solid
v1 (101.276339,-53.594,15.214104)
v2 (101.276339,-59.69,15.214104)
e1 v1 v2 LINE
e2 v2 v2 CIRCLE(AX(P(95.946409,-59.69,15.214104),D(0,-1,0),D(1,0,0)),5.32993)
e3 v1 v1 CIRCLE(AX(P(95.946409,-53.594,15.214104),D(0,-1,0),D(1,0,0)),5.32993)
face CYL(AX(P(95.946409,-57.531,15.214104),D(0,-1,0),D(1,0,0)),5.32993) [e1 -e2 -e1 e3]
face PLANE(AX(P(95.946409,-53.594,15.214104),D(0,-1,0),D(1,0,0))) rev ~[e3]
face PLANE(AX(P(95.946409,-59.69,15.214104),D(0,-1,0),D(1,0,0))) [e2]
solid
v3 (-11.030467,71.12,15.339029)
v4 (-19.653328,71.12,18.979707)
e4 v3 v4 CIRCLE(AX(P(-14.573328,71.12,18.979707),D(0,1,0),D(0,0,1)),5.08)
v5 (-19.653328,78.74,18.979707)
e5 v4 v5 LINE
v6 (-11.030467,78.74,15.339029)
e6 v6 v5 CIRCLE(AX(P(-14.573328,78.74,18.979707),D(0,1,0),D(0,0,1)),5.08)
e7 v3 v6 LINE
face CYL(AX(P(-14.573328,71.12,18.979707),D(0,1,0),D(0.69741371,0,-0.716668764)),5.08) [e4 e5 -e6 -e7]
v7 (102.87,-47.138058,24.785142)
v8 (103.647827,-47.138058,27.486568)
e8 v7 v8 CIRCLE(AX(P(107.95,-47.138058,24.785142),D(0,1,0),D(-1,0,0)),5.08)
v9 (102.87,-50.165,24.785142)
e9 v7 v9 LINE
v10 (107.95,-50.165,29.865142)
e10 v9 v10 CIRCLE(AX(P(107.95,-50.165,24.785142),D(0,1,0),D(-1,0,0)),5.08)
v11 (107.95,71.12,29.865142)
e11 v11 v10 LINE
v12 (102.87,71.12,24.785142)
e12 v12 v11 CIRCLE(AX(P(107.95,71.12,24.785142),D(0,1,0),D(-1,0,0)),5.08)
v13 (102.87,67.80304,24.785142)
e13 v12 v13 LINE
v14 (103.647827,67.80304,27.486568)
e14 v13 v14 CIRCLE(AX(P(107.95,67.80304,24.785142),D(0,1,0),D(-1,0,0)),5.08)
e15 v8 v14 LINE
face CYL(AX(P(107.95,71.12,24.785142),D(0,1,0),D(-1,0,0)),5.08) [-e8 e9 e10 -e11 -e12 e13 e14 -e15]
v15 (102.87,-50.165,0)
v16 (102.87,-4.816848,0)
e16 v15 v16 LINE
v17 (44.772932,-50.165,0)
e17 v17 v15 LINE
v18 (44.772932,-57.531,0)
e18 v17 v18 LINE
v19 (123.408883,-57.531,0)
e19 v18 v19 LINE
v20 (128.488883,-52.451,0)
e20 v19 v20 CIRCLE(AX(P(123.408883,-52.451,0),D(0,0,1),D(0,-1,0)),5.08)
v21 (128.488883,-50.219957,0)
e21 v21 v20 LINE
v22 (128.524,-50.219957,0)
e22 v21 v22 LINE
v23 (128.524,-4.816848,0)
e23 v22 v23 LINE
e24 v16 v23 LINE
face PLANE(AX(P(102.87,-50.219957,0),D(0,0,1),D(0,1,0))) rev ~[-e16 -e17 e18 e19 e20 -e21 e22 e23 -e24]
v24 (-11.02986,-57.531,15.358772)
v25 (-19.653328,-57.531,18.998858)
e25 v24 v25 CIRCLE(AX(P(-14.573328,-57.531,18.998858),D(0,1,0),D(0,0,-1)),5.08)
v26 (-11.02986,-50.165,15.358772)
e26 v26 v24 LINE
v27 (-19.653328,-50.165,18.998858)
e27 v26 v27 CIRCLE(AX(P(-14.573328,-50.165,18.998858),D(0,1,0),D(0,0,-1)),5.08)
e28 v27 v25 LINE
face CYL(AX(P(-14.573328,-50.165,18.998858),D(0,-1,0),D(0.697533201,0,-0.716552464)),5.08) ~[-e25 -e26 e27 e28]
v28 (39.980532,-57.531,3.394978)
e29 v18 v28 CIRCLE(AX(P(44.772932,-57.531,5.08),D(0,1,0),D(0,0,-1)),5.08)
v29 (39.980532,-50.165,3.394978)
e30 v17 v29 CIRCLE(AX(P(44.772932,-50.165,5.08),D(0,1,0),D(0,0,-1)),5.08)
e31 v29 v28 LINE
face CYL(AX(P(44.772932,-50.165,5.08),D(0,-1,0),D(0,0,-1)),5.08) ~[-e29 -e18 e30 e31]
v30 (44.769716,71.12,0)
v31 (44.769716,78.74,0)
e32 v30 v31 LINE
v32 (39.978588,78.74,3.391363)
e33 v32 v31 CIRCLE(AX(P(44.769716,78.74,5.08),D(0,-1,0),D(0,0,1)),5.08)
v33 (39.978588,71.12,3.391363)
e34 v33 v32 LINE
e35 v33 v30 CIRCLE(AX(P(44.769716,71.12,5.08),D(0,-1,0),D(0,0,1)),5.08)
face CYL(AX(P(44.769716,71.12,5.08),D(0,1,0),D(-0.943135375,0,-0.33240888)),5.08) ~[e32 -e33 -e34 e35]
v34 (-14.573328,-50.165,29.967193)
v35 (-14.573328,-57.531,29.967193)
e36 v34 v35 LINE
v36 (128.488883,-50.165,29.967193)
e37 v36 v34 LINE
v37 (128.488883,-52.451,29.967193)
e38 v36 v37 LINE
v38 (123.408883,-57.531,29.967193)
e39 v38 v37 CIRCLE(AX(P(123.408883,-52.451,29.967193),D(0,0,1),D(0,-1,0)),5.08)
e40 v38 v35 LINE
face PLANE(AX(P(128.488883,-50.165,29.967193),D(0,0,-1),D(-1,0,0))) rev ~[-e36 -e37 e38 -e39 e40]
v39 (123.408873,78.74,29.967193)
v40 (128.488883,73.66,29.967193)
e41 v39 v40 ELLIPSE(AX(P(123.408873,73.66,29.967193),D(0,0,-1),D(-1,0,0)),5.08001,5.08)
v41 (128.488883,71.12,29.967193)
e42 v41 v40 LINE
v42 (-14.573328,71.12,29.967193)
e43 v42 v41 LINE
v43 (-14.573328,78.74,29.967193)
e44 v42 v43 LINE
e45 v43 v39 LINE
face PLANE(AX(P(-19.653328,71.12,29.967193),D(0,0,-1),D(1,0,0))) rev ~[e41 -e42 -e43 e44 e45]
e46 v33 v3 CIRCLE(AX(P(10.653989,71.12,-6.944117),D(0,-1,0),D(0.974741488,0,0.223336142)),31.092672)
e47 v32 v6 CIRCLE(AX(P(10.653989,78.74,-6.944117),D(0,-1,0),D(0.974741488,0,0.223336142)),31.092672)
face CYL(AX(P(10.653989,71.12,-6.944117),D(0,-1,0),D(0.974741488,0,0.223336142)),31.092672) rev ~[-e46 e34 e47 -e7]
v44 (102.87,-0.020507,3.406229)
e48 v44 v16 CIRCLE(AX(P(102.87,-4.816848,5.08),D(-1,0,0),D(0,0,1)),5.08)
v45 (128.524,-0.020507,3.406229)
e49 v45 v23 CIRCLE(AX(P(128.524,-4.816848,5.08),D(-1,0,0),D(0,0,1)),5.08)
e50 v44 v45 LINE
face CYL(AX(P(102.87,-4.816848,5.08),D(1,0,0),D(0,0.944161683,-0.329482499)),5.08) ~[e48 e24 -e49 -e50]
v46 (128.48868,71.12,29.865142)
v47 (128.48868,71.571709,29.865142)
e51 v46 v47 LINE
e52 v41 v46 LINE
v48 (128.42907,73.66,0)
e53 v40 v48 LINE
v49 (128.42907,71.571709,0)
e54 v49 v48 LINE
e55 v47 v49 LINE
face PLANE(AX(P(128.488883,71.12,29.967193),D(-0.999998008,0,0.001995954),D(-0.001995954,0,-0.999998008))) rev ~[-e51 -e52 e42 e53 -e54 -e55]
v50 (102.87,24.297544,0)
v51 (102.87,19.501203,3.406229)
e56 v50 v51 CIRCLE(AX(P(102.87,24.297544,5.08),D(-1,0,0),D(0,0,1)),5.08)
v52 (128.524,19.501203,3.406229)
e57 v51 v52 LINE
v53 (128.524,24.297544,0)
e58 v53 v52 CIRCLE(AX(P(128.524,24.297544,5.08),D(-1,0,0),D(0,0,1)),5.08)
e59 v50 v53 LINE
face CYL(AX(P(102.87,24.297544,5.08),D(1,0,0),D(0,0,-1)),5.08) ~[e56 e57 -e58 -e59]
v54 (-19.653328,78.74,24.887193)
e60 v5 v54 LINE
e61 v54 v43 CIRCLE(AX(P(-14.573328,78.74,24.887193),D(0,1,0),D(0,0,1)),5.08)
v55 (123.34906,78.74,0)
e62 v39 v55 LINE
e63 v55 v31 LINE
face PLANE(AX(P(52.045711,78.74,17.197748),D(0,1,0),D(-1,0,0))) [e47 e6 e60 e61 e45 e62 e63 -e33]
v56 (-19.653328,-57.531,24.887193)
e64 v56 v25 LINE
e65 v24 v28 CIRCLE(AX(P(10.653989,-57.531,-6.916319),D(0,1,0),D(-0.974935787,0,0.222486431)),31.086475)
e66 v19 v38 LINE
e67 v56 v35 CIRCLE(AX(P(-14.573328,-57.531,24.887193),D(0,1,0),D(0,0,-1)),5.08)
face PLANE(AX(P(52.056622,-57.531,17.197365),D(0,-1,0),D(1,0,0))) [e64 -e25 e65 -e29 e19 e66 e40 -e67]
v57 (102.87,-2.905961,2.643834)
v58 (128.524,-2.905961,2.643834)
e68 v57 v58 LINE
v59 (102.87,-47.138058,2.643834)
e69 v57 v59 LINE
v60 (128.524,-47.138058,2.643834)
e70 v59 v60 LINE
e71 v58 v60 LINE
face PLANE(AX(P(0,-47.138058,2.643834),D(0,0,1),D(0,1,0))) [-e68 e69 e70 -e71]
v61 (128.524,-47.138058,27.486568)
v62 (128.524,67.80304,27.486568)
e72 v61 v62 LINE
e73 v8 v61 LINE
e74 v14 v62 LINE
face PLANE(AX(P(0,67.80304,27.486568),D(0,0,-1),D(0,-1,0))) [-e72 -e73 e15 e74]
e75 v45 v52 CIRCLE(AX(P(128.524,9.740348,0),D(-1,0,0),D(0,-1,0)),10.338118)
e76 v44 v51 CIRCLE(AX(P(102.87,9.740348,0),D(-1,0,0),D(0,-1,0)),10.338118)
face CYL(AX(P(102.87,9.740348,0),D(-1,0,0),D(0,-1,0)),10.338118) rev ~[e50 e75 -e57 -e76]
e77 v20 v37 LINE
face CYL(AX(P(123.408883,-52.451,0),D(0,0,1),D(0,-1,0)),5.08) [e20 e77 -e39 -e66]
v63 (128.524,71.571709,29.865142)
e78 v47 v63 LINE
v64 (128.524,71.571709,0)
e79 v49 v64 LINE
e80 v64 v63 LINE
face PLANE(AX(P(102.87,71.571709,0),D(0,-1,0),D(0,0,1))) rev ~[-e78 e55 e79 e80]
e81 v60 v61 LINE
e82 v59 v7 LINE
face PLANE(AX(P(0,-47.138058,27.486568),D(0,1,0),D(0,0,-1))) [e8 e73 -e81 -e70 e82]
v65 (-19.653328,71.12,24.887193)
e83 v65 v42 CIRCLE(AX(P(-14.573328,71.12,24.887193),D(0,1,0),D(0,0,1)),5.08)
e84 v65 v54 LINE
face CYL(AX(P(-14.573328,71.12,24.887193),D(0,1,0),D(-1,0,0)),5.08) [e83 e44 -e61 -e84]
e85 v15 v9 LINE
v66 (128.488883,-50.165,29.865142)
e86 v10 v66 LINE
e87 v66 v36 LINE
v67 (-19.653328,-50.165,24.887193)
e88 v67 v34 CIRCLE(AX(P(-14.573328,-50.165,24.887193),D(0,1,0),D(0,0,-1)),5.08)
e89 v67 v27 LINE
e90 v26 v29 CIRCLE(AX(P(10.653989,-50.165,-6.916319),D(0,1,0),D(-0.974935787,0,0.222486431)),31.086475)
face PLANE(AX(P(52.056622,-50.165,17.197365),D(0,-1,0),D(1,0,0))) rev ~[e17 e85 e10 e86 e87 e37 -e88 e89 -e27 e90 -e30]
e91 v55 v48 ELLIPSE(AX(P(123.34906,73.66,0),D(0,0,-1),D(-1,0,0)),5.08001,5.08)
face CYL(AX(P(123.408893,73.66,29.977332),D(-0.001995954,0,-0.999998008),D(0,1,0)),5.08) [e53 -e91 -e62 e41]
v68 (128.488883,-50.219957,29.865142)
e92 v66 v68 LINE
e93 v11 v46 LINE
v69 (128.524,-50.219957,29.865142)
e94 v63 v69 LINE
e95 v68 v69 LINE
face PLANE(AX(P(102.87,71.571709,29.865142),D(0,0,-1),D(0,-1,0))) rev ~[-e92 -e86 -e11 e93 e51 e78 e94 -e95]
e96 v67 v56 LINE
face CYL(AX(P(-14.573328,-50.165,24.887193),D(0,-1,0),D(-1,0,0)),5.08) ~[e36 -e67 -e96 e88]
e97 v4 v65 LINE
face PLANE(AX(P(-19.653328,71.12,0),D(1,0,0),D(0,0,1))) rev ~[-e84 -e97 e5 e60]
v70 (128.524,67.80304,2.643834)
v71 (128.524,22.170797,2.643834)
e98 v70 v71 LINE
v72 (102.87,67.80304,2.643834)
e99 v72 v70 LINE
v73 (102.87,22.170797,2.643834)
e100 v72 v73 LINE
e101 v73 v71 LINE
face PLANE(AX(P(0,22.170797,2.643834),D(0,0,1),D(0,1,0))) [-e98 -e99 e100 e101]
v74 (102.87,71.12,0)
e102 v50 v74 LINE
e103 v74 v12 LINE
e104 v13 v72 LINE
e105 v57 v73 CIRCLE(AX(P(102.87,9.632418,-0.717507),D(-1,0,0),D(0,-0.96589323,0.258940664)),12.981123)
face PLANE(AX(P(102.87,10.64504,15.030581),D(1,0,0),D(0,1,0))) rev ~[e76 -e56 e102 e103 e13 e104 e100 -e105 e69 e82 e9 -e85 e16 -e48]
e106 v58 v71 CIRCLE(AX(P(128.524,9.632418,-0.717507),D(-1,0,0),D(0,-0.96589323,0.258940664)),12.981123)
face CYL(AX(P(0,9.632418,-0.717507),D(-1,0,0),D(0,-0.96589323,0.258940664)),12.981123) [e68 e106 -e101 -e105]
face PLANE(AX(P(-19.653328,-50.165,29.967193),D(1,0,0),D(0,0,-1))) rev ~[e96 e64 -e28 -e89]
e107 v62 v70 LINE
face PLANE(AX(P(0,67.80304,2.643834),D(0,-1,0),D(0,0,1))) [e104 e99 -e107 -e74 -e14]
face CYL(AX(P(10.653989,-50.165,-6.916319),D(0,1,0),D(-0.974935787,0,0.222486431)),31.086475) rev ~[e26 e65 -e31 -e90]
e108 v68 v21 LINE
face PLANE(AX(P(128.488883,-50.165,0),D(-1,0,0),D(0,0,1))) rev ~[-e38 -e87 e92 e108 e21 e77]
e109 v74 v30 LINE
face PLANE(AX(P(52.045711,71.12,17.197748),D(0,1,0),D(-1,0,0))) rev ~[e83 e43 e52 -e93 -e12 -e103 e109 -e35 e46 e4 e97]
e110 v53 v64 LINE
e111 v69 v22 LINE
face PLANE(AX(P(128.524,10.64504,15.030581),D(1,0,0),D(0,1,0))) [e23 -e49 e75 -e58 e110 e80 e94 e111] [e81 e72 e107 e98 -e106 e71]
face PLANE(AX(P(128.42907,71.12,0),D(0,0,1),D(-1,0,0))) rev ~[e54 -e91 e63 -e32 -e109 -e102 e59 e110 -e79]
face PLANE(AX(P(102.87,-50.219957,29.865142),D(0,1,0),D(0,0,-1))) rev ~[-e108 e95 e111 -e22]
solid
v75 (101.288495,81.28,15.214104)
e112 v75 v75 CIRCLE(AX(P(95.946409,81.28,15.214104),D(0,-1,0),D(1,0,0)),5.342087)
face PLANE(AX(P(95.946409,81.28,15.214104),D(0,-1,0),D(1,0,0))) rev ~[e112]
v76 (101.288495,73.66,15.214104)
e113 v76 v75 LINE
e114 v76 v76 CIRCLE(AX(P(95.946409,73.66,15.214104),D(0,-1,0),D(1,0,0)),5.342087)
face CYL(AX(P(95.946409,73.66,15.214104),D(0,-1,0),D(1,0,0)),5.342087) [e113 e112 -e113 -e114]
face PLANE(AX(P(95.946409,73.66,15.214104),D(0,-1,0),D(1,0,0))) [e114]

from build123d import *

# Parameters (mm, degrees)
F1_START      = 50.165
F1_DEPTH      = 7.366
F3_START      = 102.87
F3_DEPTH      = 25.654
F5_DEPTH      = 156.845
F5_DEPTH_BACK = 153.67
F7_START      = 121.285
F7_DEPTH      = 7.62
F8_R          = 5.3299304063
F9_DEPTH      = 2.159
F9_DEPTH_BACK = 3.937
F11_START     = -133.35
F10_R         = 5.3420866917
F11_DEPTH     = 7.62
F12_R         = 5.08
F13_R         = 5.08
F14_R         = 5.08
F15_T1_DEPTH  = 121.285
F16_R         = 5.08


# Not quite as in the source:
# - a fillet or chamfer that OpenCascade refuses, or shapes differently, is made with other operations: its cross-section is extruded or revolved along the edge and cut away or added


with BuildPart() as f1:
    # F0 (on Front) → F1 (new body)
    with BuildSketch(Plane.XZ.offset(F1_START)):
        with BuildLine():
            Line((128.4888833761, 0), (128.4888833761, 29.9671925604))
            Line((128.4888833761, 29.9671925604), (-19.6533282994, 29.9671925604))
            Line((-19.6533282994, 29.9671925604), (-19.6533282994, 0))
            ThreePointArc((-19.6533282994, 0), (10.6539891214, 24.1701564864), (40.9613065422, 0))
            Line((40.9613065422, 0), (128.4888833761, 0))
        make_face()
    extrude(amount=F1_DEPTH)

    # F2 (on Right) → F3 (join)
    with BuildSketch(Plane.YZ.offset(F3_START)):
        with BuildLine():
            Line((71.5717085687, 29.865141958), (-50.2199567854, 29.865141958))
            Line((-50.2199567854, 29.865141958), (-50.2199567854, 0))
            Line((-50.2199567854, 0), (-0.5977698866, 0))
            ThreePointArc((-0.5977698866, 0), (9.740347974, 10.3381178606), (20.0784658346, 0))
            Line((20.0784658346, 0), (71.5717085687, 0))
            Line((71.5717085687, 0), (71.5717085687, 29.865141958))
        make_face()
    extrude(amount=F3_DEPTH)

    # F4 (on Right) → F5 (cut, two sides)
    with BuildSketch(Plane.YZ) as f5_sk:
        with BuildLine():
            Line((67.8030401468, 27.4865683168), (-47.1380576491, 27.4865683168))
            Line((-47.1380576491, 27.4865683168), (-47.1380576491, 2.6438338682))
            Line((-47.1380576491, 2.6438338682), (-2.90596069, 2.6438338682))
            ThreePointArc((-2.90596069, 2.6438338682), (9.6324179322, 12.2636161005), (22.1707965543, 2.6438338682))
            Line((22.1707965543, 2.6438338682), (67.8030401468, 2.6438338682))
            Line((67.8030401468, 2.6438338682), (67.8030401468, 27.4865683168))
        make_face()
    extrude(amount=-F5_DEPTH, mode=Mode.SUBTRACT)
    extrude(f5_sk.sketch, amount=F5_DEPTH_BACK, mode=Mode.SUBTRACT)

    # F6 (on face) → F7 (join)
    with BuildSketch(Plane(origin=(0, -50.165, 0), x_dir=(-1, 0, 0), z_dir=(0, 1, 0)).offset(F7_START)):
        with BuildLine():
            ThreePointArc((-40.9613065422, 0), (-10.6539891214, 24.1485546437), (19.6533282994, 0))
            Line((19.6533282994, 0), (19.6533282994, 29.9671925604))
            Line((19.6533282994, 29.9671925604), (-128.4888833761, 29.9671925604))
            Line((-128.4888833761, 29.9671925604), (-128.4290701151, 0))
            Line((-128.4290701151, 0), (-40.9613065422, 0))
        make_face()
    extrude(amount=F7_DEPTH)

    # F12
    f12_edges = [f1.edges().sort_by_distance(p)[0] for p in [
        (-19.653328, -53.848, 0),
        (-19.653328, 74.93, 0),
        (-19.653328, -53.848, 29.967193),
        (-19.653328, 74.93, 29.967193),
    ]]
    fillet(f12_edges, radius=F12_R)

    # F13
    f13_edges = [f1.edges().sort_by_distance(p)[0] for p in [
        (40.961307, -53.848, 0),
        (40.961307, 74.93, 0),
    ]]
    fillet(f13_edges, radius=F13_R)

    # F14
    f14_edges = [f1.edges().sort_by_distance(p)[0] for p in [
        (115.697, -0.59777, 0),
        (115.697, 20.078466, 0),
    ]]
    fillet(f14_edges, radius=F14_R)

    # F15: fillet of radius 5.08 on 1 edges, made by hand

    # F15_s2 → F15_t1 (cut)
    with BuildSketch(Plane.XZ.offset(-71.12)):
        with BuildLine():
            ThreePointArc((102.87, 24.785141958), (104.3578975516, 28.3772444064), (107.95, 29.865141958))
            Line((107.95, 29.865141958), (102.87, 29.865141958))
            Line((102.87, 29.865141958), (102.87, 24.785141958))
        make_face()
    extrude(amount=F15_T1_DEPTH, mode=Mode.SUBTRACT)

    # F16
    f16_edges = [f1.edges().sort_by_distance(p)[0] for p in [
        (128.458977, 78.74, 14.983596),
        (128.488883, -57.531, 14.983596),
    ]]
    fillet(f16_edges, radius=F16_R)


with BuildPart() as f9:
    # F8 (on face) → F9 (new body, two sides)
    with BuildSketch(Plane.XZ.offset(57.531)) as f9_sk:
        with Locations((95.9464088082, 15.2141042054)):
            Circle(F8_R)
    extrude(amount=F9_DEPTH)
    extrude(f9_sk.sketch, amount=-F9_DEPTH_BACK)


with BuildPart() as f11:
    # F10 (on face) → F11 (new body)
    with BuildSketch(Plane.XZ.offset(59.69).offset(F11_START)):
        with Locations((95.9464088082, 15.2141042054)):
            Circle(F10_R)
    extrude(amount=-F11_DEPTH)


solid = Compound([f1.part, f9.part, f11.part])
